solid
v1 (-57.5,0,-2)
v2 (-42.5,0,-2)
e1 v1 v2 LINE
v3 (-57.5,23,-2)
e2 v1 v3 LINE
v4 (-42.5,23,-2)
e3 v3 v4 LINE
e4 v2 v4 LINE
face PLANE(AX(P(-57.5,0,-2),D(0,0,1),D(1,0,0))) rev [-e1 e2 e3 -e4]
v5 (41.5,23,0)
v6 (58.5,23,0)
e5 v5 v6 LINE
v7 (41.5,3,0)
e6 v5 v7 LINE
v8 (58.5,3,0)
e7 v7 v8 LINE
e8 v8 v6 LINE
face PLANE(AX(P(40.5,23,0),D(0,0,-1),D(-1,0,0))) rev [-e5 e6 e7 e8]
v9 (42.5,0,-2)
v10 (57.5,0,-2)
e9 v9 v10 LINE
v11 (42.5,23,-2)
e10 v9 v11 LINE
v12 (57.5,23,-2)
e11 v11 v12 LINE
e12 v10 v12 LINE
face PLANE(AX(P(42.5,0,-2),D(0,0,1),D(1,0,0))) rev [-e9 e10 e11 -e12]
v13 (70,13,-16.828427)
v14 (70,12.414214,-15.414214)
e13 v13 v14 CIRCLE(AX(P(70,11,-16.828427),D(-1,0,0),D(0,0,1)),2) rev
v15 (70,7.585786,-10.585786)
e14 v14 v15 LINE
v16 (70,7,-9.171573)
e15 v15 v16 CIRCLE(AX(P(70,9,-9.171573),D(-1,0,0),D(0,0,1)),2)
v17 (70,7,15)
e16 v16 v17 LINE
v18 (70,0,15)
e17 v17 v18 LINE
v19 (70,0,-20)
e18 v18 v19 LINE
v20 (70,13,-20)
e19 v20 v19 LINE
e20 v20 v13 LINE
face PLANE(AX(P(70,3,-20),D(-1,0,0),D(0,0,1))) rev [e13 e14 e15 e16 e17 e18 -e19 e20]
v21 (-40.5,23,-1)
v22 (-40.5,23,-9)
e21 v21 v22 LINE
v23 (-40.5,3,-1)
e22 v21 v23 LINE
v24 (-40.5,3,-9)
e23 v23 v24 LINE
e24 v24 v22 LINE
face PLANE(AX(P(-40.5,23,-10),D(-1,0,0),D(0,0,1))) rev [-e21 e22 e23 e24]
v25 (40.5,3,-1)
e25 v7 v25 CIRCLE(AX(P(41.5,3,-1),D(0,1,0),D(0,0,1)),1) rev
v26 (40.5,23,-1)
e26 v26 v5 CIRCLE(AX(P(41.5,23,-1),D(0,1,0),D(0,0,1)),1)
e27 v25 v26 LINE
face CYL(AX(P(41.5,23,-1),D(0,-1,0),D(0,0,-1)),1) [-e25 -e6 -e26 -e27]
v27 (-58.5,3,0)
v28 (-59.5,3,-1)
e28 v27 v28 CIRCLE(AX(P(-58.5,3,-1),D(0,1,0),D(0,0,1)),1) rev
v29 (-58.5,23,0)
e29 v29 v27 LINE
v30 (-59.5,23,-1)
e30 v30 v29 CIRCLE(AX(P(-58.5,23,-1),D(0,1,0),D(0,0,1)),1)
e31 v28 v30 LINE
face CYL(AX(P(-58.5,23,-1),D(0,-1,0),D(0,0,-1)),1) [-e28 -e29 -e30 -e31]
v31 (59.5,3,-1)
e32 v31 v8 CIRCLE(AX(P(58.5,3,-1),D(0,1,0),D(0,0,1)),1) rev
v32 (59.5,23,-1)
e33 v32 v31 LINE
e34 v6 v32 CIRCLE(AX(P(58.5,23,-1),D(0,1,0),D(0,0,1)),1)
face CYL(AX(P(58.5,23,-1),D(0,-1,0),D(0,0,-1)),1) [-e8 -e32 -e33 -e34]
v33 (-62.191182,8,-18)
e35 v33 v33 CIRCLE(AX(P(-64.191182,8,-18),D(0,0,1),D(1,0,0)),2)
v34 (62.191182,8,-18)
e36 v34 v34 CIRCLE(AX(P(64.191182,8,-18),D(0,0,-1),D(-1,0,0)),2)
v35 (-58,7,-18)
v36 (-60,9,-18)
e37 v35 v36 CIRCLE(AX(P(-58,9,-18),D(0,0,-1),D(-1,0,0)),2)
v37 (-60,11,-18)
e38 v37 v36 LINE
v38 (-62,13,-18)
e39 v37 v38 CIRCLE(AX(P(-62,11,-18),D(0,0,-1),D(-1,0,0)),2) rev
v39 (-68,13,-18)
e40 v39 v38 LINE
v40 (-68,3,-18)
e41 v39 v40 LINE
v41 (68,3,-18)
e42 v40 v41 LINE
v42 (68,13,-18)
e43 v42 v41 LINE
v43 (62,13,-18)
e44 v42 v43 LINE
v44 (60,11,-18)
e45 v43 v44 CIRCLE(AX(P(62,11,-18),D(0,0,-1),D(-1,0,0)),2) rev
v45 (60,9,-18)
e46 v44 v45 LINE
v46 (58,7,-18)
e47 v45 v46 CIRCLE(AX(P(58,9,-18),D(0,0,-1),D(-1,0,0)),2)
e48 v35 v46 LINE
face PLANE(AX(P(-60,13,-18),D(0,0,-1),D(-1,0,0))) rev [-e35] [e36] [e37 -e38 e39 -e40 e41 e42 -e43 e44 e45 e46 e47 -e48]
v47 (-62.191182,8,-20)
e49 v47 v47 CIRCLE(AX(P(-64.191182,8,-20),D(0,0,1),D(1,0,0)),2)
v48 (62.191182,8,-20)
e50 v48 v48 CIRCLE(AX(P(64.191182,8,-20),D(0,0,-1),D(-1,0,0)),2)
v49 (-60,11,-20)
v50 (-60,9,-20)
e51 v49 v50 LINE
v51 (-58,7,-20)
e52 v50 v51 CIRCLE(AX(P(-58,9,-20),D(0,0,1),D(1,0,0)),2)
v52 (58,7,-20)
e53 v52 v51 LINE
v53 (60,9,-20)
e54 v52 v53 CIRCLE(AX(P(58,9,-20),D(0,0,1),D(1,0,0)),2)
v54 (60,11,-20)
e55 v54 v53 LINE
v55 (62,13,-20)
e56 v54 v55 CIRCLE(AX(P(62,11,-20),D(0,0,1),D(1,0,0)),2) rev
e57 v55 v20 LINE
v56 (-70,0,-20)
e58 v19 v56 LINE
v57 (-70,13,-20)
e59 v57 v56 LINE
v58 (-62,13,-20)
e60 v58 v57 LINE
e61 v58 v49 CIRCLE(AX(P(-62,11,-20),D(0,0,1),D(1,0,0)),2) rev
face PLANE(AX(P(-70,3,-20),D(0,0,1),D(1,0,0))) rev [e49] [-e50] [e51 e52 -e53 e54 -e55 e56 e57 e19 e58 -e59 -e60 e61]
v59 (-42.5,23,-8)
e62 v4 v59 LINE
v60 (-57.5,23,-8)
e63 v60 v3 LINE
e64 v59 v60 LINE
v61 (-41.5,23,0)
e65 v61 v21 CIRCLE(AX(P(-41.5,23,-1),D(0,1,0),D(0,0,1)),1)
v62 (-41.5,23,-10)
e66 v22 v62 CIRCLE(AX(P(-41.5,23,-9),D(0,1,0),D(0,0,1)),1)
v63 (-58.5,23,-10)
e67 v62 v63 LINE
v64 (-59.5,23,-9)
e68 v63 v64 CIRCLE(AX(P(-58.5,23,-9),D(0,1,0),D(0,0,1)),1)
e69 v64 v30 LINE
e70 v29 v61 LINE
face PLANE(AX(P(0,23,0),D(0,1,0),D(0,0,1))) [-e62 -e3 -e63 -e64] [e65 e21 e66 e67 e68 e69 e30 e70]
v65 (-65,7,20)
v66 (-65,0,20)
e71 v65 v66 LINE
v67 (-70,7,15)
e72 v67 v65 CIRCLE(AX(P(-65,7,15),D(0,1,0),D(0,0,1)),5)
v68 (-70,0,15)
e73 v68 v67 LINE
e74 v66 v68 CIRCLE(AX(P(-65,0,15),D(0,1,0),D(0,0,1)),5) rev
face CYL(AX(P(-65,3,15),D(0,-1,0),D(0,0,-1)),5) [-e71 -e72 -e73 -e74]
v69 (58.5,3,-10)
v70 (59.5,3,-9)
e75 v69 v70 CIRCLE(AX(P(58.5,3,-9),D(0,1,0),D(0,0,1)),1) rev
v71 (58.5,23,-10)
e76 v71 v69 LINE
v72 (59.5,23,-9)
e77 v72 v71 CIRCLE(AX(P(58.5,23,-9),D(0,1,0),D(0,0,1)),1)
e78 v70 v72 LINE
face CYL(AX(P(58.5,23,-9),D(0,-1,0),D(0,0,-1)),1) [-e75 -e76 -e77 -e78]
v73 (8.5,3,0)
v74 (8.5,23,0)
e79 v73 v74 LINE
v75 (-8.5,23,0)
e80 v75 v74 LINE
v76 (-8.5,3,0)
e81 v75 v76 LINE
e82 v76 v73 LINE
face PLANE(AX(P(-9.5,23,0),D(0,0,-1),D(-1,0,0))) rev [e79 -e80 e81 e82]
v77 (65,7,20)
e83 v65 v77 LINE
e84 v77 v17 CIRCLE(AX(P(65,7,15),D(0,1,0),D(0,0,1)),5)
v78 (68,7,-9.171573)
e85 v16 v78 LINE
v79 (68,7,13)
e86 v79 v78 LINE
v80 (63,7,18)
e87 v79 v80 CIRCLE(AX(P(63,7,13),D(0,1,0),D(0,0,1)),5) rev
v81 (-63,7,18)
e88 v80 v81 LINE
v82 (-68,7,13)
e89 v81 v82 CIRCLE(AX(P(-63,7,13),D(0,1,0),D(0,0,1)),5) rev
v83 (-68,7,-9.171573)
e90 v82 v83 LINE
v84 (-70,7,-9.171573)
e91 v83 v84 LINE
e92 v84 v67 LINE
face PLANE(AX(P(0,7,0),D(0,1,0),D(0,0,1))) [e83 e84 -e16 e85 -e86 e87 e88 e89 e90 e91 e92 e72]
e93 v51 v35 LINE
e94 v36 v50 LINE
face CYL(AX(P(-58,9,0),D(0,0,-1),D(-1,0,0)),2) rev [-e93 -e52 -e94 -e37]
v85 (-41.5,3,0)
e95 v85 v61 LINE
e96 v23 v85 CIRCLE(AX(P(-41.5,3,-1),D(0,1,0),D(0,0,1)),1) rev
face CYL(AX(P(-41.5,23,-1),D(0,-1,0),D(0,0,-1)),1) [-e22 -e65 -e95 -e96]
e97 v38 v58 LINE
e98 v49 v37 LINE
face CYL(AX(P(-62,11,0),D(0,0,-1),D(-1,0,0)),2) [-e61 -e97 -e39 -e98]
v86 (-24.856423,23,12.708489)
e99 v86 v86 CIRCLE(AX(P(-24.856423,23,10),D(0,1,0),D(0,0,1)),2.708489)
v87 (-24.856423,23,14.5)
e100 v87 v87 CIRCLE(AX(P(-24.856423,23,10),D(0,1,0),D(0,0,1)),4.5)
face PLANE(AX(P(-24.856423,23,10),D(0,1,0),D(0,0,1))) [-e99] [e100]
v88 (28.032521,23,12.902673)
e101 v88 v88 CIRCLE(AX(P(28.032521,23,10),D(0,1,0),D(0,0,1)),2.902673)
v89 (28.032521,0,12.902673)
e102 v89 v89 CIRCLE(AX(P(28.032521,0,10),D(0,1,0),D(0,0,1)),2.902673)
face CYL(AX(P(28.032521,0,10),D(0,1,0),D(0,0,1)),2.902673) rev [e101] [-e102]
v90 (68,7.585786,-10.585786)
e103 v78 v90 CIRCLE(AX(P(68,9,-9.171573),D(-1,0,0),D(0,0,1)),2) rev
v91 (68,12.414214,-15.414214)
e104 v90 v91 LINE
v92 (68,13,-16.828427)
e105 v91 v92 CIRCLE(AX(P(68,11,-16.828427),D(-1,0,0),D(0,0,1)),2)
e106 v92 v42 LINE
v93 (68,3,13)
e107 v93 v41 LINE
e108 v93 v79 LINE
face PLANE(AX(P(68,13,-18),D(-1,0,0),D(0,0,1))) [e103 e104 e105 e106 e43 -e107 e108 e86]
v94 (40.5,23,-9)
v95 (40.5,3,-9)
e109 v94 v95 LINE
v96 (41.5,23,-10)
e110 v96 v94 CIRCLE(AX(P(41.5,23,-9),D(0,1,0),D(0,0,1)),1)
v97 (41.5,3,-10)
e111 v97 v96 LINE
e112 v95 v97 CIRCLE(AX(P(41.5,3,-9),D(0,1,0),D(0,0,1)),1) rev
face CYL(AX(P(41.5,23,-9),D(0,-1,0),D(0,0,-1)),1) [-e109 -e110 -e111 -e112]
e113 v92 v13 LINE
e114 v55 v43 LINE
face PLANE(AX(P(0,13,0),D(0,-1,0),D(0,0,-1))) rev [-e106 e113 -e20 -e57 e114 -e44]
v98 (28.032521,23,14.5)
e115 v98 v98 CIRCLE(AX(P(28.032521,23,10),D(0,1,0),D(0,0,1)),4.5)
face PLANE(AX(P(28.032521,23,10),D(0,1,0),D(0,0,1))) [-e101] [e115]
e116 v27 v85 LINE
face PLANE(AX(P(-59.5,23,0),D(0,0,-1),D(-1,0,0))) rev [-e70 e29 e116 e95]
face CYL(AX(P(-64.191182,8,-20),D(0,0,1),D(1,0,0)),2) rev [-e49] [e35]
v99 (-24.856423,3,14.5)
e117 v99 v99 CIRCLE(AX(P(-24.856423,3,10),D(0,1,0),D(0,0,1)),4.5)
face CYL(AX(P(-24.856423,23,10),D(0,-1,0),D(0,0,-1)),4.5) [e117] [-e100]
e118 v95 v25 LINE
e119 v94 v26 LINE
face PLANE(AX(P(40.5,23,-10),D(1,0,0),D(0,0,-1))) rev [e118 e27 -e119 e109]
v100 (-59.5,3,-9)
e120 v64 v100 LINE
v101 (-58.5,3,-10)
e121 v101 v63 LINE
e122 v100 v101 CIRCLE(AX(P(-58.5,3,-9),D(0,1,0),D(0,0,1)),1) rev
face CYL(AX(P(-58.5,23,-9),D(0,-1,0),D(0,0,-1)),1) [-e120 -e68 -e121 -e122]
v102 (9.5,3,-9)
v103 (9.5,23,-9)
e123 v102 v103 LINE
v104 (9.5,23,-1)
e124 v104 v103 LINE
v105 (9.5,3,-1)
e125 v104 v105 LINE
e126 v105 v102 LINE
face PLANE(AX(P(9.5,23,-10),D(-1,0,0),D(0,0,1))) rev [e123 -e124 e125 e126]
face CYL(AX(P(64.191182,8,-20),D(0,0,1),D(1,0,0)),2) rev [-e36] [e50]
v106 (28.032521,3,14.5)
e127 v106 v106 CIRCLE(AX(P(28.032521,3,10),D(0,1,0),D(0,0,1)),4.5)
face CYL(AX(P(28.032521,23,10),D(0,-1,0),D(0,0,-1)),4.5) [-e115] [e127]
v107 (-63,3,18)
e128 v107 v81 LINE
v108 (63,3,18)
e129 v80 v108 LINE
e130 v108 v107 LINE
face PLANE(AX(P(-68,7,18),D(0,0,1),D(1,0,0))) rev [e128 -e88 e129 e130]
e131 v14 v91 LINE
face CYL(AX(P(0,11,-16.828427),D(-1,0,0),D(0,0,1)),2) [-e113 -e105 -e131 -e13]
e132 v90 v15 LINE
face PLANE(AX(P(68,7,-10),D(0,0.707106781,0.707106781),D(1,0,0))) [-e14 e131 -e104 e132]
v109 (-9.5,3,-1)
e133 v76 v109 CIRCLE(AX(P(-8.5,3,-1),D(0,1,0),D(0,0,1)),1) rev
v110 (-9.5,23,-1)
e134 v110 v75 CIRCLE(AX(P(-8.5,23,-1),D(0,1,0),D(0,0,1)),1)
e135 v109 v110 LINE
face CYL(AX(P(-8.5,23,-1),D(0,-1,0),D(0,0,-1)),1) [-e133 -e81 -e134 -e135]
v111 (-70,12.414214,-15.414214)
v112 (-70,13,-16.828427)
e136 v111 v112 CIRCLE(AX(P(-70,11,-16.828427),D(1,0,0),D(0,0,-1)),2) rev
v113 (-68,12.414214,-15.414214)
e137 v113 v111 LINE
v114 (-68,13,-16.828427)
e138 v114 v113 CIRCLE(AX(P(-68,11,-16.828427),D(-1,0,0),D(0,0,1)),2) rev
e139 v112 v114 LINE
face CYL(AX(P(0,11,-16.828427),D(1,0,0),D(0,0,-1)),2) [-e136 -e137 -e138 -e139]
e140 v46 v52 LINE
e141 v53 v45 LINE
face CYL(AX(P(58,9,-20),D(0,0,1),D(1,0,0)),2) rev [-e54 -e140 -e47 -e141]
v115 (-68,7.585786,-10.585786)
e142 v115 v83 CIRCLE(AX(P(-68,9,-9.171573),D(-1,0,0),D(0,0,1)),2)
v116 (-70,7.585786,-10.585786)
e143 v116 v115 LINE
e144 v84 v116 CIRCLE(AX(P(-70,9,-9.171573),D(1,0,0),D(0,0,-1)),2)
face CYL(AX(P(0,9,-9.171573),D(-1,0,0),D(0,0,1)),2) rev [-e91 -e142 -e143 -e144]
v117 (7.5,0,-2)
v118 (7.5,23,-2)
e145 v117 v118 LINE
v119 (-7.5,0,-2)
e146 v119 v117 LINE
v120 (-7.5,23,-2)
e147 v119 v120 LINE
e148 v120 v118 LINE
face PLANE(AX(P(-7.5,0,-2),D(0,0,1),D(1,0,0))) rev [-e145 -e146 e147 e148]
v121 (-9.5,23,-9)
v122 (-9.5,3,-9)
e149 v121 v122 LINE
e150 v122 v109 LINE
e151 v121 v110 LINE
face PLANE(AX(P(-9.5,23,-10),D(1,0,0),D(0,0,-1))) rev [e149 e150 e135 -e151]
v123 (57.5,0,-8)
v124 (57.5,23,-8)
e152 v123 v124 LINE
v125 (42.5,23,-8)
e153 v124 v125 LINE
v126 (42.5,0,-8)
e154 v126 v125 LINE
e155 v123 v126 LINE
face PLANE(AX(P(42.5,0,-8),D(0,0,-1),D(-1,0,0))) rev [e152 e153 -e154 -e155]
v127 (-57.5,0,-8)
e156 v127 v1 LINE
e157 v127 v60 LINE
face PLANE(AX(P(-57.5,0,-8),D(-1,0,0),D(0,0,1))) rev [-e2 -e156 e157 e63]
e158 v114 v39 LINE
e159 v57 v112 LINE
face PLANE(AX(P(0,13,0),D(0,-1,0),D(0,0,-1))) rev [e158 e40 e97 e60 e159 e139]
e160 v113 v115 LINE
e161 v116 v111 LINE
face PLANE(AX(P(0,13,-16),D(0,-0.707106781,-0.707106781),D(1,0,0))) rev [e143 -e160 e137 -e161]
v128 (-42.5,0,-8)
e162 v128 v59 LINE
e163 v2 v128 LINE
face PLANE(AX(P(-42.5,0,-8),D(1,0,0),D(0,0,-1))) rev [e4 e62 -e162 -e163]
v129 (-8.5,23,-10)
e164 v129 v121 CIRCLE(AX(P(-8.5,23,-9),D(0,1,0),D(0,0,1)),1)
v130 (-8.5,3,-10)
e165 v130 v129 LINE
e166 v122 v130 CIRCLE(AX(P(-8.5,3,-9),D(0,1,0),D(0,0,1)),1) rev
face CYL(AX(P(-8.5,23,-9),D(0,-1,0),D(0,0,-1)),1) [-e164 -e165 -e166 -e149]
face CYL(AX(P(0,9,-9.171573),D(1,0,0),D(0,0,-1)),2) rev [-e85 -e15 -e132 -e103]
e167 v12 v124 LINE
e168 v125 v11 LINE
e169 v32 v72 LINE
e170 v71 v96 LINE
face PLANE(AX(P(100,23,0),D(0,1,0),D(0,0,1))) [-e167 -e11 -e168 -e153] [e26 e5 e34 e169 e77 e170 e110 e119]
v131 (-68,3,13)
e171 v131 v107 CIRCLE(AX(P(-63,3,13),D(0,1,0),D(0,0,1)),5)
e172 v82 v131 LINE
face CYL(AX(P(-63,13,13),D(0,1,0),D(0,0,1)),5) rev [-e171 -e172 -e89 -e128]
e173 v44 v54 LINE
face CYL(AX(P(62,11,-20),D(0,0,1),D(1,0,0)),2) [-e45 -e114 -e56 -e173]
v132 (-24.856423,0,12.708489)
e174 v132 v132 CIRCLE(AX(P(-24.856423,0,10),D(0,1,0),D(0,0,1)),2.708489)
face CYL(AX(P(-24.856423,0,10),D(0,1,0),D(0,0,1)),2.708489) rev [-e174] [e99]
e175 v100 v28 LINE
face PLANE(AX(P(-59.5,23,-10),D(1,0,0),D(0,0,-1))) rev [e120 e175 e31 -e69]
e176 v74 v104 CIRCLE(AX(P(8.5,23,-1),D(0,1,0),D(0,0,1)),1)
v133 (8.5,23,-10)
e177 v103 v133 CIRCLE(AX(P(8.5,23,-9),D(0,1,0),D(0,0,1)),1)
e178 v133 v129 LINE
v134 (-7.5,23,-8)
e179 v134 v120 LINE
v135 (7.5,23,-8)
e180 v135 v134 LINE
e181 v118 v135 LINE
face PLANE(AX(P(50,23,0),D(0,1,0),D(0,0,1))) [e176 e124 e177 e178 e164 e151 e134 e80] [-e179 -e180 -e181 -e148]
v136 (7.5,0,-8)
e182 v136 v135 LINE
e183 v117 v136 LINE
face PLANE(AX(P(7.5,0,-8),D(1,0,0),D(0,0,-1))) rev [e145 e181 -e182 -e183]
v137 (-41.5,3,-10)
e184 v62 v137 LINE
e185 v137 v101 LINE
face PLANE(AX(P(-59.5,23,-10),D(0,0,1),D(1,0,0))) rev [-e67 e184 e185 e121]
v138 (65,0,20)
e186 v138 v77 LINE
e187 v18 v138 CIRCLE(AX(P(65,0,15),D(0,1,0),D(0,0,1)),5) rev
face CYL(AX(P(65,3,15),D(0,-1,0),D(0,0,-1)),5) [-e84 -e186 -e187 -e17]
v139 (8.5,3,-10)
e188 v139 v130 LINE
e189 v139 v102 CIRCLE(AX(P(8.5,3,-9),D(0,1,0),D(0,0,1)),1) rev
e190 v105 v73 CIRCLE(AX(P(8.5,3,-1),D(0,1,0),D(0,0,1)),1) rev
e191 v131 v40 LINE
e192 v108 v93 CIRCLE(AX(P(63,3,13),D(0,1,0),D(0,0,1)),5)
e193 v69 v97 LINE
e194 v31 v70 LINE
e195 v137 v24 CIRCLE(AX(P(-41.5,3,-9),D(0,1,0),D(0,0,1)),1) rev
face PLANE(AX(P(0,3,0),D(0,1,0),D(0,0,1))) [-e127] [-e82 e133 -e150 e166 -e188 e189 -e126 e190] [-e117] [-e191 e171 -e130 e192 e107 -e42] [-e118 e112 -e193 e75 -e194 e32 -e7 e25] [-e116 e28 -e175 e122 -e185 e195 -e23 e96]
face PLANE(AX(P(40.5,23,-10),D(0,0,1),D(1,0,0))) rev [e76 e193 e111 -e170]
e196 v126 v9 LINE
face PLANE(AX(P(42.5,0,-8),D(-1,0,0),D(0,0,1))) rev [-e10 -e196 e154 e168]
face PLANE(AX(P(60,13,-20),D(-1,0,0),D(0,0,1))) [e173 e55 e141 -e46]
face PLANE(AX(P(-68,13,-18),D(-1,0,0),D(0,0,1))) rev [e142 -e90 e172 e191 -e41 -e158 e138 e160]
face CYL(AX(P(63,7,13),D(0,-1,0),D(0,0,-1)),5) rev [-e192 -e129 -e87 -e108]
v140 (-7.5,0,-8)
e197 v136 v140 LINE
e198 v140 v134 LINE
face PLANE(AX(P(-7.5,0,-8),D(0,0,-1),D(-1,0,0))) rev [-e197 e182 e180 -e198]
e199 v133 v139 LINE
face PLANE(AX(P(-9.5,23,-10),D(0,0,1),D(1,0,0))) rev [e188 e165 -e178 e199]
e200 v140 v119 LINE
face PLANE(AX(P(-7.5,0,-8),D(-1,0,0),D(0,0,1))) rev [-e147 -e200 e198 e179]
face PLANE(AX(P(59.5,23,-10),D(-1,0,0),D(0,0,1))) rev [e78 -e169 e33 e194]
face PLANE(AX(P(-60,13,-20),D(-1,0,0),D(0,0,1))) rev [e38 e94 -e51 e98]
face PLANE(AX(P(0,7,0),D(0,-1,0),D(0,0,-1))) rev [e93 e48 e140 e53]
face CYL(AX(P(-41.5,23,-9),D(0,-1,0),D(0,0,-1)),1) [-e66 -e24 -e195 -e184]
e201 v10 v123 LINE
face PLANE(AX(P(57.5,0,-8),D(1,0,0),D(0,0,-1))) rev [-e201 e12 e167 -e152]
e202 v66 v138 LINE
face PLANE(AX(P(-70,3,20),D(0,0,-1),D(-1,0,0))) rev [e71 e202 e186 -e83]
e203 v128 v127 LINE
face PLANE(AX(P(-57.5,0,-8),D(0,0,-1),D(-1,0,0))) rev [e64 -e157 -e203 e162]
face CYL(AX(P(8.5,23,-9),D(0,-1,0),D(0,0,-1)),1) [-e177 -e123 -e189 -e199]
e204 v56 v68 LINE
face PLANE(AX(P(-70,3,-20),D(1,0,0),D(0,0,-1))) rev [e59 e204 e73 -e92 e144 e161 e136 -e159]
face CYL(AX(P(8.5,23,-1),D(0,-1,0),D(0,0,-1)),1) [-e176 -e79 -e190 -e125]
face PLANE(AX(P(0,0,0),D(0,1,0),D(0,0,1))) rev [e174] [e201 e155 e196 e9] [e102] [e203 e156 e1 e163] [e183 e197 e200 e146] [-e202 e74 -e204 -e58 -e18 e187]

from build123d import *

# Parameters (mm, degrees)
ESQUISSE1_W                      = 140
ESQUISSE1_H                      = 40
BOSS_EXTRU_1_DEPTH               = 3
BOSS_EXTRU_5_DEPTH               = 10
CHANFREIN1_SIZE                  = 6
ESQUISSE15_R                     = 2
ENL_V_MAT_EXTRU_7_DEPTH          = 81.703159789
ESQUISSE18_W                     = 60
ESQUISSE18_H                     = 2
BOSS_EXTRU_6_DEPTH               = 4
CONG_2_R                         = 5
CONG_3_R                         = 2
SYM_TRIE1_OUTLINE_W              = 4
SYM_TRIE1_OUTLINE_H              = 2
SYM_TRIE1_DEPTH                  = 62.191181732
SYM_TRIE1_START                  = 68
SYM_TRIE1_2_DEPTH                = 2
SYM_TRIE1_START_2                = 66.191181932
SYM_TRIE1_3_OUTLINE_W            = 10
SYM_TRIE1_3_OUTLINE_H            = 2
SYM_TRIE1_3_OUTLINE_W_2          = 4
SYM_TRIE1_3_DEPTH                = 1.808818068
SYM_TRIE1_START_3                = 62
SYM_TRIE1_4_OUTLINE_W            = 4
SYM_TRIE1_4_OUTLINE_H            = 2
SYM_TRIE1_4_DEPTH                = 6
SYM_TRIE1_5_OUTLINE_W            = 6
SYM_TRIE1_5_OUTLINE_H            = 2
SYM_TRIE1_5_DEPTH                = 0.191181732
SYM_TRIE1_START_4                = -20
SYM_TRIE1_6_DEPTH                = 2
SYM_TRIE1_START_5                = 2
SYM_TRIE1_7_DEPTH                = 5
CONG_4_R                         = 5
ESQUISSE2_W                      = 19
ESQUISSE2_H                      = 10
BOSS_EXTRU_7_DEPTH               = 20
ESQUISSE19_W                     = 15
ESQUISSE19_H                     = 6
ENL_V_MAT_EXTRU_8_DEPTH          = 77.347887987
CONG_5_R                         = 1
R_P_TITION_LIN_AIRE1_COUNT       = 3
R_P_TITION_LIN_AIRE1_PITCH       = 50
CONG_5_OF_R_P_TITION_LIN_AIRE1_R = 1
ESQUISSE23_R                     = 4.5
BOSS_EXTRU_9_DEPTH               = 20
ESQUISSE24_R                     = 2.70848906
ESQUISSE24_R_2                   = 2.902672956
ENL_V_MAT_EXTRU_10_DEPTH         = 77.347887987


with BuildPart() as part:
    # Esquisse1 → Boss.-Extru.1 (new body)
    with BuildSketch(Plane(origin=(0, 0, 0), x_dir=(1, 0, 0), z_dir=(0, 1, 0))):
        Rectangle(ESQUISSE1_W, ESQUISSE1_H)
    extrude(amount=BOSS_EXTRU_1_DEPTH)

    # Esquisse13 → Boss.-Extru.5 (add)
    with BuildSketch(Plane(origin=(0, 3, 0), x_dir=(1, 0, 0), z_dir=(0, 1, 0))):
        Polygon((-70, 20), (-60, 20), (-60, 18), (-68, 18), (-68, 10), (-70, 10), align=None)
    extrude(amount=BOSS_EXTRU_5_DEPTH)

    # Chanfrein1
    chanfrein1_edges = [part.edges().sort_by_distance(p)[0] for p in [
        (-69, 13, -10),
    ]]
    chamfer(chanfrein1_edges, length=CHANFREIN1_SIZE)

    # Esquisse15 → Enlèv. mat.-Extru.7 (cut, through all)
    with BuildSketch(Plane.XY.offset(-18)):
        with Locations((-64.191181832, 8)):
            Circle(ESQUISSE15_R)
    extrude(amount=-ENL_V_MAT_EXTRU_7_DEPTH, mode=Mode.SUBTRACT)

    # Esquisse18 → Boss.-Extru.6 (add)
    with BuildSketch(Plane(origin=(0, 3, 0), x_dir=(1, 0, 0), z_dir=(0, 1, 0))):
        Polygon((-68, 10), (-68, -18), (0, -18), (0, -20), (-70, -20), (-70, 10), align=None)
        with Locations((-30, 19)):
            Rectangle(ESQUISSE18_W, ESQUISSE18_H)
    extrude(amount=BOSS_EXTRU_6_DEPTH)

    # Congé2
    cong_2_edges = [part.edges().sort_by_distance(p)[0] for p in [
        (-68, 5, 18),
        (-70, 3.5, 20),
    ]]
    fillet(cong_2_edges, radius=CONG_2_R)

    # Congé3
    cong_3_edges = [part.edges().sort_by_distance(p)[0] for p in [
        (-60, 13, -19),
        (-69, 13, -16),
        (-69, 7, -10),
        (-60, 7, -19),
    ]]
    fillet(cong_3_edges, radius=CONG_3_R)

    # Symétrie1: read off the stored shape, not the designer's step
    # Symétrie1 outline → Symétrie1 (add)
    with BuildSketch(Plane.YZ):
        with Locations((5, -19)):
            Rectangle(SYM_TRIE1_OUTLINE_W, SYM_TRIE1_OUTLINE_H)
        with Locations((5, 19)):
            Rectangle(SYM_TRIE1_OUTLINE_W, SYM_TRIE1_OUTLINE_H)
    extrude(amount=SYM_TRIE1_DEPTH)

    # Sym_trie1 2 outline → Sym_trie1 2 (add)
    with BuildSketch(Plane.YZ.offset(SYM_TRIE1_START)):
        with BuildLine():
            Line((13, -20), (13, -16.828427125))
            ThreePointArc((13, -16.828427125), (12.847759065, -16.06306026), (12.414213562, -15.414213562))
            Line((12.414213562, -15.414213562), (7.585786438, -10.585786438))
            ThreePointArc((7.585786438, -10.585786438), (7.152240935, -9.93693974), (7, -9.171572875))
            Line((7, -9.171572875), (7, 20))
            Line((7, 20), (3, 20))
            Line((3, 20), (3, -20))
            Line((3, -20), (13, -20))
        make_face()
    extrude(amount=SYM_TRIE1_2_DEPTH)

    # Sym_trie1 3 outline → Sym_trie1 3 (add)
    with BuildSketch(Plane.YZ.offset(SYM_TRIE1_START_2)):
        with Locations((8, -19)):
            Rectangle(SYM_TRIE1_3_OUTLINE_W, SYM_TRIE1_3_OUTLINE_H)
        with Locations((5, 19)):
            Rectangle(SYM_TRIE1_3_OUTLINE_W_2, SYM_TRIE1_3_OUTLINE_H)
    extrude(amount=SYM_TRIE1_3_DEPTH)

    # Sym_trie1 4 outline → Sym_trie1 4 (add)
    with BuildSketch(Plane.YZ.offset(SYM_TRIE1_START_3)):
        with Locations((5, 19)):
            Rectangle(SYM_TRIE1_4_OUTLINE_W, SYM_TRIE1_4_OUTLINE_H)
    extrude(amount=SYM_TRIE1_4_DEPTH)

    # Sym_trie1 5 outline → Sym_trie1 5 (add)
    with BuildSketch(Plane.YZ.offset(SYM_TRIE1_START_3)):
        with Locations((10, -19)):
            Rectangle(SYM_TRIE1_5_OUTLINE_W, SYM_TRIE1_5_OUTLINE_H)
    extrude(amount=SYM_TRIE1_5_DEPTH)

    # Sym_trie1 6 outline → Sym_trie1 6 (add)
    with BuildSketch(Plane.XY.offset(SYM_TRIE1_START_4)):
        with BuildLine():
            ThreePointArc((62, 13), (60.585786438, 12.414213562), (60, 11))
            Line((60, 11), (60, 9))
            ThreePointArc((60, 9), (59.414213562, 7.585786438), (58, 7))
            Line((58, 7), (62, 7))
            Line((62, 7), (62, 13))
        make_face()
        with BuildLine():
            Line((66.191181932, 13), (62.191181732, 13))
            Line((62.191181732, 13), (62.191181832, 8))
            ThreePointArc((62.191181832, 8), (64.191181832, 10), (66.191181832, 8))
            Line((66.191181832, 8), (66.191181932, 13))
        make_face()
        with BuildLine():
            Line((62.191181832, 8), (62.191181732, 3))
            Line((62.191181732, 3), (66.191181932, 3))
            Line((66.191181932, 3), (66.191181832, 8))
            ThreePointArc((66.191181832, 8), (64.191181832, 6), (62.191181832, 8))
        make_face()
    extrude(amount=SYM_TRIE1_6_DEPTH)

    # Sym_trie1 7 outline → Sym_trie1 7 (add)
    with BuildSketch(Plane(origin=(0, 0, 0), x_dir=(1, 0, 0), z_dir=(0, 1, 0)).offset(SYM_TRIE1_START_5)):
        with BuildLine():
            Line((68, -18), (68, -13))
            ThreePointArc((68, -13), (66.535533906, -16.535533906), (63, -18))
            Line((63, -18), (68, -18))
        make_face()
    extrude(amount=SYM_TRIE1_7_DEPTH)

    # Congé4
    cong_4_edges = [part.edges().sort_by_distance(p)[0] for p in [
        (70, 3.5, 20),
    ]]
    fillet(cong_4_edges, radius=CONG_4_R)

    # Esquisse2 → Boss.-Extru.7 (add)
    with BuildSketch(Plane(origin=(0, 3, 0), x_dir=(1, 0, 0), z_dir=(0, 1, 0))):
        with Locations((-50, 5)):
            Rectangle(ESQUISSE2_W, ESQUISSE2_H)
    boss_extru_7 = extrude(amount=BOSS_EXTRU_7_DEPTH)

    # Esquisse19 → Enlèv. mat.-Extru.8 (cut, through all)
    with BuildSketch(Plane(origin=(0, 23, 0), x_dir=(1, 0, 0), z_dir=(0, 1, 0))):
        with Locations((-50, 5)):
            Rectangle(ESQUISSE19_W, ESQUISSE19_H)
    enl_v_mat_extru_8 = extrude(amount=-ENL_V_MAT_EXTRU_8_DEPTH, mode=Mode.SUBTRACT)

    # Congé5
    cong_5_edges = [part.edges().sort_by_distance(p)[0] for p in [
        (-40.5, 13, 0),
        (-40.5, 13, -10),
        (-59.5, 13, -10),
        (-59.5, 13, 0),
    ]]
    fillet(cong_5_edges, radius=CONG_5_R)

    # Répétition linéaire1: Boss.-Extru.7, Enlèv. mat.-Extru.8 ×3
    with Locations(*[(i * R_P_TITION_LIN_AIRE1_PITCH, 0, 0) for i in range(1, R_P_TITION_LIN_AIRE1_COUNT)]):
        add(boss_extru_7)
        add(enl_v_mat_extru_8, mode=Mode.SUBTRACT)

    # Congé5 of Répétition linéaire1
    cong_5_of_r_p_tition_lin_aire1_edges = [part.edges().sort_by_distance(p)[0] for p in [
        (9.5, 13, 0),
        (9.5, 13, -10),
        (-9.5, 13, -10),
        (-9.5, 13, 0),
        (59.5, 13, 0),
        (59.5, 13, -10),
        (40.5, 13, -10),
        (40.5, 13, 0),
    ]]
    fillet(cong_5_of_r_p_tition_lin_aire1_edges, radius=CONG_5_OF_R_P_TITION_LIN_AIRE1_R)

    # Esquisse23 → Boss.-Extru.9 (add)
    with BuildSketch(Plane(origin=(0, 3, 0), x_dir=(1, 0, 0), z_dir=(0, 1, 0))):
        with Locations(Location((-24.856422556, -10, 0), (0, 0, 270))):
            Circle(ESQUISSE23_R)
        with Locations(Location((28.032520994, -10, 0), (0, 0, 270))):
            Circle(ESQUISSE23_R)
    extrude(amount=BOSS_EXTRU_9_DEPTH)

    # Esquisse24 → Enlèv. mat.-Extru.10 (cut, through all)
    with BuildSketch(Plane(origin=(0, 23, 0), x_dir=(1, 0, 0), z_dir=(0, 1, 0))):
        with Locations(Location((-24.856422556, -10, 0), (0, 0, 270))):
            Circle(ESQUISSE24_R)
        with Locations(Location((28.032520994, -10, 0), (0, 0, 270))):
            Circle(ESQUISSE24_R_2)
    extrude(amount=-ENL_V_MAT_EXTRU_10_DEPTH, mode=Mode.SUBTRACT)


solid = part.part
